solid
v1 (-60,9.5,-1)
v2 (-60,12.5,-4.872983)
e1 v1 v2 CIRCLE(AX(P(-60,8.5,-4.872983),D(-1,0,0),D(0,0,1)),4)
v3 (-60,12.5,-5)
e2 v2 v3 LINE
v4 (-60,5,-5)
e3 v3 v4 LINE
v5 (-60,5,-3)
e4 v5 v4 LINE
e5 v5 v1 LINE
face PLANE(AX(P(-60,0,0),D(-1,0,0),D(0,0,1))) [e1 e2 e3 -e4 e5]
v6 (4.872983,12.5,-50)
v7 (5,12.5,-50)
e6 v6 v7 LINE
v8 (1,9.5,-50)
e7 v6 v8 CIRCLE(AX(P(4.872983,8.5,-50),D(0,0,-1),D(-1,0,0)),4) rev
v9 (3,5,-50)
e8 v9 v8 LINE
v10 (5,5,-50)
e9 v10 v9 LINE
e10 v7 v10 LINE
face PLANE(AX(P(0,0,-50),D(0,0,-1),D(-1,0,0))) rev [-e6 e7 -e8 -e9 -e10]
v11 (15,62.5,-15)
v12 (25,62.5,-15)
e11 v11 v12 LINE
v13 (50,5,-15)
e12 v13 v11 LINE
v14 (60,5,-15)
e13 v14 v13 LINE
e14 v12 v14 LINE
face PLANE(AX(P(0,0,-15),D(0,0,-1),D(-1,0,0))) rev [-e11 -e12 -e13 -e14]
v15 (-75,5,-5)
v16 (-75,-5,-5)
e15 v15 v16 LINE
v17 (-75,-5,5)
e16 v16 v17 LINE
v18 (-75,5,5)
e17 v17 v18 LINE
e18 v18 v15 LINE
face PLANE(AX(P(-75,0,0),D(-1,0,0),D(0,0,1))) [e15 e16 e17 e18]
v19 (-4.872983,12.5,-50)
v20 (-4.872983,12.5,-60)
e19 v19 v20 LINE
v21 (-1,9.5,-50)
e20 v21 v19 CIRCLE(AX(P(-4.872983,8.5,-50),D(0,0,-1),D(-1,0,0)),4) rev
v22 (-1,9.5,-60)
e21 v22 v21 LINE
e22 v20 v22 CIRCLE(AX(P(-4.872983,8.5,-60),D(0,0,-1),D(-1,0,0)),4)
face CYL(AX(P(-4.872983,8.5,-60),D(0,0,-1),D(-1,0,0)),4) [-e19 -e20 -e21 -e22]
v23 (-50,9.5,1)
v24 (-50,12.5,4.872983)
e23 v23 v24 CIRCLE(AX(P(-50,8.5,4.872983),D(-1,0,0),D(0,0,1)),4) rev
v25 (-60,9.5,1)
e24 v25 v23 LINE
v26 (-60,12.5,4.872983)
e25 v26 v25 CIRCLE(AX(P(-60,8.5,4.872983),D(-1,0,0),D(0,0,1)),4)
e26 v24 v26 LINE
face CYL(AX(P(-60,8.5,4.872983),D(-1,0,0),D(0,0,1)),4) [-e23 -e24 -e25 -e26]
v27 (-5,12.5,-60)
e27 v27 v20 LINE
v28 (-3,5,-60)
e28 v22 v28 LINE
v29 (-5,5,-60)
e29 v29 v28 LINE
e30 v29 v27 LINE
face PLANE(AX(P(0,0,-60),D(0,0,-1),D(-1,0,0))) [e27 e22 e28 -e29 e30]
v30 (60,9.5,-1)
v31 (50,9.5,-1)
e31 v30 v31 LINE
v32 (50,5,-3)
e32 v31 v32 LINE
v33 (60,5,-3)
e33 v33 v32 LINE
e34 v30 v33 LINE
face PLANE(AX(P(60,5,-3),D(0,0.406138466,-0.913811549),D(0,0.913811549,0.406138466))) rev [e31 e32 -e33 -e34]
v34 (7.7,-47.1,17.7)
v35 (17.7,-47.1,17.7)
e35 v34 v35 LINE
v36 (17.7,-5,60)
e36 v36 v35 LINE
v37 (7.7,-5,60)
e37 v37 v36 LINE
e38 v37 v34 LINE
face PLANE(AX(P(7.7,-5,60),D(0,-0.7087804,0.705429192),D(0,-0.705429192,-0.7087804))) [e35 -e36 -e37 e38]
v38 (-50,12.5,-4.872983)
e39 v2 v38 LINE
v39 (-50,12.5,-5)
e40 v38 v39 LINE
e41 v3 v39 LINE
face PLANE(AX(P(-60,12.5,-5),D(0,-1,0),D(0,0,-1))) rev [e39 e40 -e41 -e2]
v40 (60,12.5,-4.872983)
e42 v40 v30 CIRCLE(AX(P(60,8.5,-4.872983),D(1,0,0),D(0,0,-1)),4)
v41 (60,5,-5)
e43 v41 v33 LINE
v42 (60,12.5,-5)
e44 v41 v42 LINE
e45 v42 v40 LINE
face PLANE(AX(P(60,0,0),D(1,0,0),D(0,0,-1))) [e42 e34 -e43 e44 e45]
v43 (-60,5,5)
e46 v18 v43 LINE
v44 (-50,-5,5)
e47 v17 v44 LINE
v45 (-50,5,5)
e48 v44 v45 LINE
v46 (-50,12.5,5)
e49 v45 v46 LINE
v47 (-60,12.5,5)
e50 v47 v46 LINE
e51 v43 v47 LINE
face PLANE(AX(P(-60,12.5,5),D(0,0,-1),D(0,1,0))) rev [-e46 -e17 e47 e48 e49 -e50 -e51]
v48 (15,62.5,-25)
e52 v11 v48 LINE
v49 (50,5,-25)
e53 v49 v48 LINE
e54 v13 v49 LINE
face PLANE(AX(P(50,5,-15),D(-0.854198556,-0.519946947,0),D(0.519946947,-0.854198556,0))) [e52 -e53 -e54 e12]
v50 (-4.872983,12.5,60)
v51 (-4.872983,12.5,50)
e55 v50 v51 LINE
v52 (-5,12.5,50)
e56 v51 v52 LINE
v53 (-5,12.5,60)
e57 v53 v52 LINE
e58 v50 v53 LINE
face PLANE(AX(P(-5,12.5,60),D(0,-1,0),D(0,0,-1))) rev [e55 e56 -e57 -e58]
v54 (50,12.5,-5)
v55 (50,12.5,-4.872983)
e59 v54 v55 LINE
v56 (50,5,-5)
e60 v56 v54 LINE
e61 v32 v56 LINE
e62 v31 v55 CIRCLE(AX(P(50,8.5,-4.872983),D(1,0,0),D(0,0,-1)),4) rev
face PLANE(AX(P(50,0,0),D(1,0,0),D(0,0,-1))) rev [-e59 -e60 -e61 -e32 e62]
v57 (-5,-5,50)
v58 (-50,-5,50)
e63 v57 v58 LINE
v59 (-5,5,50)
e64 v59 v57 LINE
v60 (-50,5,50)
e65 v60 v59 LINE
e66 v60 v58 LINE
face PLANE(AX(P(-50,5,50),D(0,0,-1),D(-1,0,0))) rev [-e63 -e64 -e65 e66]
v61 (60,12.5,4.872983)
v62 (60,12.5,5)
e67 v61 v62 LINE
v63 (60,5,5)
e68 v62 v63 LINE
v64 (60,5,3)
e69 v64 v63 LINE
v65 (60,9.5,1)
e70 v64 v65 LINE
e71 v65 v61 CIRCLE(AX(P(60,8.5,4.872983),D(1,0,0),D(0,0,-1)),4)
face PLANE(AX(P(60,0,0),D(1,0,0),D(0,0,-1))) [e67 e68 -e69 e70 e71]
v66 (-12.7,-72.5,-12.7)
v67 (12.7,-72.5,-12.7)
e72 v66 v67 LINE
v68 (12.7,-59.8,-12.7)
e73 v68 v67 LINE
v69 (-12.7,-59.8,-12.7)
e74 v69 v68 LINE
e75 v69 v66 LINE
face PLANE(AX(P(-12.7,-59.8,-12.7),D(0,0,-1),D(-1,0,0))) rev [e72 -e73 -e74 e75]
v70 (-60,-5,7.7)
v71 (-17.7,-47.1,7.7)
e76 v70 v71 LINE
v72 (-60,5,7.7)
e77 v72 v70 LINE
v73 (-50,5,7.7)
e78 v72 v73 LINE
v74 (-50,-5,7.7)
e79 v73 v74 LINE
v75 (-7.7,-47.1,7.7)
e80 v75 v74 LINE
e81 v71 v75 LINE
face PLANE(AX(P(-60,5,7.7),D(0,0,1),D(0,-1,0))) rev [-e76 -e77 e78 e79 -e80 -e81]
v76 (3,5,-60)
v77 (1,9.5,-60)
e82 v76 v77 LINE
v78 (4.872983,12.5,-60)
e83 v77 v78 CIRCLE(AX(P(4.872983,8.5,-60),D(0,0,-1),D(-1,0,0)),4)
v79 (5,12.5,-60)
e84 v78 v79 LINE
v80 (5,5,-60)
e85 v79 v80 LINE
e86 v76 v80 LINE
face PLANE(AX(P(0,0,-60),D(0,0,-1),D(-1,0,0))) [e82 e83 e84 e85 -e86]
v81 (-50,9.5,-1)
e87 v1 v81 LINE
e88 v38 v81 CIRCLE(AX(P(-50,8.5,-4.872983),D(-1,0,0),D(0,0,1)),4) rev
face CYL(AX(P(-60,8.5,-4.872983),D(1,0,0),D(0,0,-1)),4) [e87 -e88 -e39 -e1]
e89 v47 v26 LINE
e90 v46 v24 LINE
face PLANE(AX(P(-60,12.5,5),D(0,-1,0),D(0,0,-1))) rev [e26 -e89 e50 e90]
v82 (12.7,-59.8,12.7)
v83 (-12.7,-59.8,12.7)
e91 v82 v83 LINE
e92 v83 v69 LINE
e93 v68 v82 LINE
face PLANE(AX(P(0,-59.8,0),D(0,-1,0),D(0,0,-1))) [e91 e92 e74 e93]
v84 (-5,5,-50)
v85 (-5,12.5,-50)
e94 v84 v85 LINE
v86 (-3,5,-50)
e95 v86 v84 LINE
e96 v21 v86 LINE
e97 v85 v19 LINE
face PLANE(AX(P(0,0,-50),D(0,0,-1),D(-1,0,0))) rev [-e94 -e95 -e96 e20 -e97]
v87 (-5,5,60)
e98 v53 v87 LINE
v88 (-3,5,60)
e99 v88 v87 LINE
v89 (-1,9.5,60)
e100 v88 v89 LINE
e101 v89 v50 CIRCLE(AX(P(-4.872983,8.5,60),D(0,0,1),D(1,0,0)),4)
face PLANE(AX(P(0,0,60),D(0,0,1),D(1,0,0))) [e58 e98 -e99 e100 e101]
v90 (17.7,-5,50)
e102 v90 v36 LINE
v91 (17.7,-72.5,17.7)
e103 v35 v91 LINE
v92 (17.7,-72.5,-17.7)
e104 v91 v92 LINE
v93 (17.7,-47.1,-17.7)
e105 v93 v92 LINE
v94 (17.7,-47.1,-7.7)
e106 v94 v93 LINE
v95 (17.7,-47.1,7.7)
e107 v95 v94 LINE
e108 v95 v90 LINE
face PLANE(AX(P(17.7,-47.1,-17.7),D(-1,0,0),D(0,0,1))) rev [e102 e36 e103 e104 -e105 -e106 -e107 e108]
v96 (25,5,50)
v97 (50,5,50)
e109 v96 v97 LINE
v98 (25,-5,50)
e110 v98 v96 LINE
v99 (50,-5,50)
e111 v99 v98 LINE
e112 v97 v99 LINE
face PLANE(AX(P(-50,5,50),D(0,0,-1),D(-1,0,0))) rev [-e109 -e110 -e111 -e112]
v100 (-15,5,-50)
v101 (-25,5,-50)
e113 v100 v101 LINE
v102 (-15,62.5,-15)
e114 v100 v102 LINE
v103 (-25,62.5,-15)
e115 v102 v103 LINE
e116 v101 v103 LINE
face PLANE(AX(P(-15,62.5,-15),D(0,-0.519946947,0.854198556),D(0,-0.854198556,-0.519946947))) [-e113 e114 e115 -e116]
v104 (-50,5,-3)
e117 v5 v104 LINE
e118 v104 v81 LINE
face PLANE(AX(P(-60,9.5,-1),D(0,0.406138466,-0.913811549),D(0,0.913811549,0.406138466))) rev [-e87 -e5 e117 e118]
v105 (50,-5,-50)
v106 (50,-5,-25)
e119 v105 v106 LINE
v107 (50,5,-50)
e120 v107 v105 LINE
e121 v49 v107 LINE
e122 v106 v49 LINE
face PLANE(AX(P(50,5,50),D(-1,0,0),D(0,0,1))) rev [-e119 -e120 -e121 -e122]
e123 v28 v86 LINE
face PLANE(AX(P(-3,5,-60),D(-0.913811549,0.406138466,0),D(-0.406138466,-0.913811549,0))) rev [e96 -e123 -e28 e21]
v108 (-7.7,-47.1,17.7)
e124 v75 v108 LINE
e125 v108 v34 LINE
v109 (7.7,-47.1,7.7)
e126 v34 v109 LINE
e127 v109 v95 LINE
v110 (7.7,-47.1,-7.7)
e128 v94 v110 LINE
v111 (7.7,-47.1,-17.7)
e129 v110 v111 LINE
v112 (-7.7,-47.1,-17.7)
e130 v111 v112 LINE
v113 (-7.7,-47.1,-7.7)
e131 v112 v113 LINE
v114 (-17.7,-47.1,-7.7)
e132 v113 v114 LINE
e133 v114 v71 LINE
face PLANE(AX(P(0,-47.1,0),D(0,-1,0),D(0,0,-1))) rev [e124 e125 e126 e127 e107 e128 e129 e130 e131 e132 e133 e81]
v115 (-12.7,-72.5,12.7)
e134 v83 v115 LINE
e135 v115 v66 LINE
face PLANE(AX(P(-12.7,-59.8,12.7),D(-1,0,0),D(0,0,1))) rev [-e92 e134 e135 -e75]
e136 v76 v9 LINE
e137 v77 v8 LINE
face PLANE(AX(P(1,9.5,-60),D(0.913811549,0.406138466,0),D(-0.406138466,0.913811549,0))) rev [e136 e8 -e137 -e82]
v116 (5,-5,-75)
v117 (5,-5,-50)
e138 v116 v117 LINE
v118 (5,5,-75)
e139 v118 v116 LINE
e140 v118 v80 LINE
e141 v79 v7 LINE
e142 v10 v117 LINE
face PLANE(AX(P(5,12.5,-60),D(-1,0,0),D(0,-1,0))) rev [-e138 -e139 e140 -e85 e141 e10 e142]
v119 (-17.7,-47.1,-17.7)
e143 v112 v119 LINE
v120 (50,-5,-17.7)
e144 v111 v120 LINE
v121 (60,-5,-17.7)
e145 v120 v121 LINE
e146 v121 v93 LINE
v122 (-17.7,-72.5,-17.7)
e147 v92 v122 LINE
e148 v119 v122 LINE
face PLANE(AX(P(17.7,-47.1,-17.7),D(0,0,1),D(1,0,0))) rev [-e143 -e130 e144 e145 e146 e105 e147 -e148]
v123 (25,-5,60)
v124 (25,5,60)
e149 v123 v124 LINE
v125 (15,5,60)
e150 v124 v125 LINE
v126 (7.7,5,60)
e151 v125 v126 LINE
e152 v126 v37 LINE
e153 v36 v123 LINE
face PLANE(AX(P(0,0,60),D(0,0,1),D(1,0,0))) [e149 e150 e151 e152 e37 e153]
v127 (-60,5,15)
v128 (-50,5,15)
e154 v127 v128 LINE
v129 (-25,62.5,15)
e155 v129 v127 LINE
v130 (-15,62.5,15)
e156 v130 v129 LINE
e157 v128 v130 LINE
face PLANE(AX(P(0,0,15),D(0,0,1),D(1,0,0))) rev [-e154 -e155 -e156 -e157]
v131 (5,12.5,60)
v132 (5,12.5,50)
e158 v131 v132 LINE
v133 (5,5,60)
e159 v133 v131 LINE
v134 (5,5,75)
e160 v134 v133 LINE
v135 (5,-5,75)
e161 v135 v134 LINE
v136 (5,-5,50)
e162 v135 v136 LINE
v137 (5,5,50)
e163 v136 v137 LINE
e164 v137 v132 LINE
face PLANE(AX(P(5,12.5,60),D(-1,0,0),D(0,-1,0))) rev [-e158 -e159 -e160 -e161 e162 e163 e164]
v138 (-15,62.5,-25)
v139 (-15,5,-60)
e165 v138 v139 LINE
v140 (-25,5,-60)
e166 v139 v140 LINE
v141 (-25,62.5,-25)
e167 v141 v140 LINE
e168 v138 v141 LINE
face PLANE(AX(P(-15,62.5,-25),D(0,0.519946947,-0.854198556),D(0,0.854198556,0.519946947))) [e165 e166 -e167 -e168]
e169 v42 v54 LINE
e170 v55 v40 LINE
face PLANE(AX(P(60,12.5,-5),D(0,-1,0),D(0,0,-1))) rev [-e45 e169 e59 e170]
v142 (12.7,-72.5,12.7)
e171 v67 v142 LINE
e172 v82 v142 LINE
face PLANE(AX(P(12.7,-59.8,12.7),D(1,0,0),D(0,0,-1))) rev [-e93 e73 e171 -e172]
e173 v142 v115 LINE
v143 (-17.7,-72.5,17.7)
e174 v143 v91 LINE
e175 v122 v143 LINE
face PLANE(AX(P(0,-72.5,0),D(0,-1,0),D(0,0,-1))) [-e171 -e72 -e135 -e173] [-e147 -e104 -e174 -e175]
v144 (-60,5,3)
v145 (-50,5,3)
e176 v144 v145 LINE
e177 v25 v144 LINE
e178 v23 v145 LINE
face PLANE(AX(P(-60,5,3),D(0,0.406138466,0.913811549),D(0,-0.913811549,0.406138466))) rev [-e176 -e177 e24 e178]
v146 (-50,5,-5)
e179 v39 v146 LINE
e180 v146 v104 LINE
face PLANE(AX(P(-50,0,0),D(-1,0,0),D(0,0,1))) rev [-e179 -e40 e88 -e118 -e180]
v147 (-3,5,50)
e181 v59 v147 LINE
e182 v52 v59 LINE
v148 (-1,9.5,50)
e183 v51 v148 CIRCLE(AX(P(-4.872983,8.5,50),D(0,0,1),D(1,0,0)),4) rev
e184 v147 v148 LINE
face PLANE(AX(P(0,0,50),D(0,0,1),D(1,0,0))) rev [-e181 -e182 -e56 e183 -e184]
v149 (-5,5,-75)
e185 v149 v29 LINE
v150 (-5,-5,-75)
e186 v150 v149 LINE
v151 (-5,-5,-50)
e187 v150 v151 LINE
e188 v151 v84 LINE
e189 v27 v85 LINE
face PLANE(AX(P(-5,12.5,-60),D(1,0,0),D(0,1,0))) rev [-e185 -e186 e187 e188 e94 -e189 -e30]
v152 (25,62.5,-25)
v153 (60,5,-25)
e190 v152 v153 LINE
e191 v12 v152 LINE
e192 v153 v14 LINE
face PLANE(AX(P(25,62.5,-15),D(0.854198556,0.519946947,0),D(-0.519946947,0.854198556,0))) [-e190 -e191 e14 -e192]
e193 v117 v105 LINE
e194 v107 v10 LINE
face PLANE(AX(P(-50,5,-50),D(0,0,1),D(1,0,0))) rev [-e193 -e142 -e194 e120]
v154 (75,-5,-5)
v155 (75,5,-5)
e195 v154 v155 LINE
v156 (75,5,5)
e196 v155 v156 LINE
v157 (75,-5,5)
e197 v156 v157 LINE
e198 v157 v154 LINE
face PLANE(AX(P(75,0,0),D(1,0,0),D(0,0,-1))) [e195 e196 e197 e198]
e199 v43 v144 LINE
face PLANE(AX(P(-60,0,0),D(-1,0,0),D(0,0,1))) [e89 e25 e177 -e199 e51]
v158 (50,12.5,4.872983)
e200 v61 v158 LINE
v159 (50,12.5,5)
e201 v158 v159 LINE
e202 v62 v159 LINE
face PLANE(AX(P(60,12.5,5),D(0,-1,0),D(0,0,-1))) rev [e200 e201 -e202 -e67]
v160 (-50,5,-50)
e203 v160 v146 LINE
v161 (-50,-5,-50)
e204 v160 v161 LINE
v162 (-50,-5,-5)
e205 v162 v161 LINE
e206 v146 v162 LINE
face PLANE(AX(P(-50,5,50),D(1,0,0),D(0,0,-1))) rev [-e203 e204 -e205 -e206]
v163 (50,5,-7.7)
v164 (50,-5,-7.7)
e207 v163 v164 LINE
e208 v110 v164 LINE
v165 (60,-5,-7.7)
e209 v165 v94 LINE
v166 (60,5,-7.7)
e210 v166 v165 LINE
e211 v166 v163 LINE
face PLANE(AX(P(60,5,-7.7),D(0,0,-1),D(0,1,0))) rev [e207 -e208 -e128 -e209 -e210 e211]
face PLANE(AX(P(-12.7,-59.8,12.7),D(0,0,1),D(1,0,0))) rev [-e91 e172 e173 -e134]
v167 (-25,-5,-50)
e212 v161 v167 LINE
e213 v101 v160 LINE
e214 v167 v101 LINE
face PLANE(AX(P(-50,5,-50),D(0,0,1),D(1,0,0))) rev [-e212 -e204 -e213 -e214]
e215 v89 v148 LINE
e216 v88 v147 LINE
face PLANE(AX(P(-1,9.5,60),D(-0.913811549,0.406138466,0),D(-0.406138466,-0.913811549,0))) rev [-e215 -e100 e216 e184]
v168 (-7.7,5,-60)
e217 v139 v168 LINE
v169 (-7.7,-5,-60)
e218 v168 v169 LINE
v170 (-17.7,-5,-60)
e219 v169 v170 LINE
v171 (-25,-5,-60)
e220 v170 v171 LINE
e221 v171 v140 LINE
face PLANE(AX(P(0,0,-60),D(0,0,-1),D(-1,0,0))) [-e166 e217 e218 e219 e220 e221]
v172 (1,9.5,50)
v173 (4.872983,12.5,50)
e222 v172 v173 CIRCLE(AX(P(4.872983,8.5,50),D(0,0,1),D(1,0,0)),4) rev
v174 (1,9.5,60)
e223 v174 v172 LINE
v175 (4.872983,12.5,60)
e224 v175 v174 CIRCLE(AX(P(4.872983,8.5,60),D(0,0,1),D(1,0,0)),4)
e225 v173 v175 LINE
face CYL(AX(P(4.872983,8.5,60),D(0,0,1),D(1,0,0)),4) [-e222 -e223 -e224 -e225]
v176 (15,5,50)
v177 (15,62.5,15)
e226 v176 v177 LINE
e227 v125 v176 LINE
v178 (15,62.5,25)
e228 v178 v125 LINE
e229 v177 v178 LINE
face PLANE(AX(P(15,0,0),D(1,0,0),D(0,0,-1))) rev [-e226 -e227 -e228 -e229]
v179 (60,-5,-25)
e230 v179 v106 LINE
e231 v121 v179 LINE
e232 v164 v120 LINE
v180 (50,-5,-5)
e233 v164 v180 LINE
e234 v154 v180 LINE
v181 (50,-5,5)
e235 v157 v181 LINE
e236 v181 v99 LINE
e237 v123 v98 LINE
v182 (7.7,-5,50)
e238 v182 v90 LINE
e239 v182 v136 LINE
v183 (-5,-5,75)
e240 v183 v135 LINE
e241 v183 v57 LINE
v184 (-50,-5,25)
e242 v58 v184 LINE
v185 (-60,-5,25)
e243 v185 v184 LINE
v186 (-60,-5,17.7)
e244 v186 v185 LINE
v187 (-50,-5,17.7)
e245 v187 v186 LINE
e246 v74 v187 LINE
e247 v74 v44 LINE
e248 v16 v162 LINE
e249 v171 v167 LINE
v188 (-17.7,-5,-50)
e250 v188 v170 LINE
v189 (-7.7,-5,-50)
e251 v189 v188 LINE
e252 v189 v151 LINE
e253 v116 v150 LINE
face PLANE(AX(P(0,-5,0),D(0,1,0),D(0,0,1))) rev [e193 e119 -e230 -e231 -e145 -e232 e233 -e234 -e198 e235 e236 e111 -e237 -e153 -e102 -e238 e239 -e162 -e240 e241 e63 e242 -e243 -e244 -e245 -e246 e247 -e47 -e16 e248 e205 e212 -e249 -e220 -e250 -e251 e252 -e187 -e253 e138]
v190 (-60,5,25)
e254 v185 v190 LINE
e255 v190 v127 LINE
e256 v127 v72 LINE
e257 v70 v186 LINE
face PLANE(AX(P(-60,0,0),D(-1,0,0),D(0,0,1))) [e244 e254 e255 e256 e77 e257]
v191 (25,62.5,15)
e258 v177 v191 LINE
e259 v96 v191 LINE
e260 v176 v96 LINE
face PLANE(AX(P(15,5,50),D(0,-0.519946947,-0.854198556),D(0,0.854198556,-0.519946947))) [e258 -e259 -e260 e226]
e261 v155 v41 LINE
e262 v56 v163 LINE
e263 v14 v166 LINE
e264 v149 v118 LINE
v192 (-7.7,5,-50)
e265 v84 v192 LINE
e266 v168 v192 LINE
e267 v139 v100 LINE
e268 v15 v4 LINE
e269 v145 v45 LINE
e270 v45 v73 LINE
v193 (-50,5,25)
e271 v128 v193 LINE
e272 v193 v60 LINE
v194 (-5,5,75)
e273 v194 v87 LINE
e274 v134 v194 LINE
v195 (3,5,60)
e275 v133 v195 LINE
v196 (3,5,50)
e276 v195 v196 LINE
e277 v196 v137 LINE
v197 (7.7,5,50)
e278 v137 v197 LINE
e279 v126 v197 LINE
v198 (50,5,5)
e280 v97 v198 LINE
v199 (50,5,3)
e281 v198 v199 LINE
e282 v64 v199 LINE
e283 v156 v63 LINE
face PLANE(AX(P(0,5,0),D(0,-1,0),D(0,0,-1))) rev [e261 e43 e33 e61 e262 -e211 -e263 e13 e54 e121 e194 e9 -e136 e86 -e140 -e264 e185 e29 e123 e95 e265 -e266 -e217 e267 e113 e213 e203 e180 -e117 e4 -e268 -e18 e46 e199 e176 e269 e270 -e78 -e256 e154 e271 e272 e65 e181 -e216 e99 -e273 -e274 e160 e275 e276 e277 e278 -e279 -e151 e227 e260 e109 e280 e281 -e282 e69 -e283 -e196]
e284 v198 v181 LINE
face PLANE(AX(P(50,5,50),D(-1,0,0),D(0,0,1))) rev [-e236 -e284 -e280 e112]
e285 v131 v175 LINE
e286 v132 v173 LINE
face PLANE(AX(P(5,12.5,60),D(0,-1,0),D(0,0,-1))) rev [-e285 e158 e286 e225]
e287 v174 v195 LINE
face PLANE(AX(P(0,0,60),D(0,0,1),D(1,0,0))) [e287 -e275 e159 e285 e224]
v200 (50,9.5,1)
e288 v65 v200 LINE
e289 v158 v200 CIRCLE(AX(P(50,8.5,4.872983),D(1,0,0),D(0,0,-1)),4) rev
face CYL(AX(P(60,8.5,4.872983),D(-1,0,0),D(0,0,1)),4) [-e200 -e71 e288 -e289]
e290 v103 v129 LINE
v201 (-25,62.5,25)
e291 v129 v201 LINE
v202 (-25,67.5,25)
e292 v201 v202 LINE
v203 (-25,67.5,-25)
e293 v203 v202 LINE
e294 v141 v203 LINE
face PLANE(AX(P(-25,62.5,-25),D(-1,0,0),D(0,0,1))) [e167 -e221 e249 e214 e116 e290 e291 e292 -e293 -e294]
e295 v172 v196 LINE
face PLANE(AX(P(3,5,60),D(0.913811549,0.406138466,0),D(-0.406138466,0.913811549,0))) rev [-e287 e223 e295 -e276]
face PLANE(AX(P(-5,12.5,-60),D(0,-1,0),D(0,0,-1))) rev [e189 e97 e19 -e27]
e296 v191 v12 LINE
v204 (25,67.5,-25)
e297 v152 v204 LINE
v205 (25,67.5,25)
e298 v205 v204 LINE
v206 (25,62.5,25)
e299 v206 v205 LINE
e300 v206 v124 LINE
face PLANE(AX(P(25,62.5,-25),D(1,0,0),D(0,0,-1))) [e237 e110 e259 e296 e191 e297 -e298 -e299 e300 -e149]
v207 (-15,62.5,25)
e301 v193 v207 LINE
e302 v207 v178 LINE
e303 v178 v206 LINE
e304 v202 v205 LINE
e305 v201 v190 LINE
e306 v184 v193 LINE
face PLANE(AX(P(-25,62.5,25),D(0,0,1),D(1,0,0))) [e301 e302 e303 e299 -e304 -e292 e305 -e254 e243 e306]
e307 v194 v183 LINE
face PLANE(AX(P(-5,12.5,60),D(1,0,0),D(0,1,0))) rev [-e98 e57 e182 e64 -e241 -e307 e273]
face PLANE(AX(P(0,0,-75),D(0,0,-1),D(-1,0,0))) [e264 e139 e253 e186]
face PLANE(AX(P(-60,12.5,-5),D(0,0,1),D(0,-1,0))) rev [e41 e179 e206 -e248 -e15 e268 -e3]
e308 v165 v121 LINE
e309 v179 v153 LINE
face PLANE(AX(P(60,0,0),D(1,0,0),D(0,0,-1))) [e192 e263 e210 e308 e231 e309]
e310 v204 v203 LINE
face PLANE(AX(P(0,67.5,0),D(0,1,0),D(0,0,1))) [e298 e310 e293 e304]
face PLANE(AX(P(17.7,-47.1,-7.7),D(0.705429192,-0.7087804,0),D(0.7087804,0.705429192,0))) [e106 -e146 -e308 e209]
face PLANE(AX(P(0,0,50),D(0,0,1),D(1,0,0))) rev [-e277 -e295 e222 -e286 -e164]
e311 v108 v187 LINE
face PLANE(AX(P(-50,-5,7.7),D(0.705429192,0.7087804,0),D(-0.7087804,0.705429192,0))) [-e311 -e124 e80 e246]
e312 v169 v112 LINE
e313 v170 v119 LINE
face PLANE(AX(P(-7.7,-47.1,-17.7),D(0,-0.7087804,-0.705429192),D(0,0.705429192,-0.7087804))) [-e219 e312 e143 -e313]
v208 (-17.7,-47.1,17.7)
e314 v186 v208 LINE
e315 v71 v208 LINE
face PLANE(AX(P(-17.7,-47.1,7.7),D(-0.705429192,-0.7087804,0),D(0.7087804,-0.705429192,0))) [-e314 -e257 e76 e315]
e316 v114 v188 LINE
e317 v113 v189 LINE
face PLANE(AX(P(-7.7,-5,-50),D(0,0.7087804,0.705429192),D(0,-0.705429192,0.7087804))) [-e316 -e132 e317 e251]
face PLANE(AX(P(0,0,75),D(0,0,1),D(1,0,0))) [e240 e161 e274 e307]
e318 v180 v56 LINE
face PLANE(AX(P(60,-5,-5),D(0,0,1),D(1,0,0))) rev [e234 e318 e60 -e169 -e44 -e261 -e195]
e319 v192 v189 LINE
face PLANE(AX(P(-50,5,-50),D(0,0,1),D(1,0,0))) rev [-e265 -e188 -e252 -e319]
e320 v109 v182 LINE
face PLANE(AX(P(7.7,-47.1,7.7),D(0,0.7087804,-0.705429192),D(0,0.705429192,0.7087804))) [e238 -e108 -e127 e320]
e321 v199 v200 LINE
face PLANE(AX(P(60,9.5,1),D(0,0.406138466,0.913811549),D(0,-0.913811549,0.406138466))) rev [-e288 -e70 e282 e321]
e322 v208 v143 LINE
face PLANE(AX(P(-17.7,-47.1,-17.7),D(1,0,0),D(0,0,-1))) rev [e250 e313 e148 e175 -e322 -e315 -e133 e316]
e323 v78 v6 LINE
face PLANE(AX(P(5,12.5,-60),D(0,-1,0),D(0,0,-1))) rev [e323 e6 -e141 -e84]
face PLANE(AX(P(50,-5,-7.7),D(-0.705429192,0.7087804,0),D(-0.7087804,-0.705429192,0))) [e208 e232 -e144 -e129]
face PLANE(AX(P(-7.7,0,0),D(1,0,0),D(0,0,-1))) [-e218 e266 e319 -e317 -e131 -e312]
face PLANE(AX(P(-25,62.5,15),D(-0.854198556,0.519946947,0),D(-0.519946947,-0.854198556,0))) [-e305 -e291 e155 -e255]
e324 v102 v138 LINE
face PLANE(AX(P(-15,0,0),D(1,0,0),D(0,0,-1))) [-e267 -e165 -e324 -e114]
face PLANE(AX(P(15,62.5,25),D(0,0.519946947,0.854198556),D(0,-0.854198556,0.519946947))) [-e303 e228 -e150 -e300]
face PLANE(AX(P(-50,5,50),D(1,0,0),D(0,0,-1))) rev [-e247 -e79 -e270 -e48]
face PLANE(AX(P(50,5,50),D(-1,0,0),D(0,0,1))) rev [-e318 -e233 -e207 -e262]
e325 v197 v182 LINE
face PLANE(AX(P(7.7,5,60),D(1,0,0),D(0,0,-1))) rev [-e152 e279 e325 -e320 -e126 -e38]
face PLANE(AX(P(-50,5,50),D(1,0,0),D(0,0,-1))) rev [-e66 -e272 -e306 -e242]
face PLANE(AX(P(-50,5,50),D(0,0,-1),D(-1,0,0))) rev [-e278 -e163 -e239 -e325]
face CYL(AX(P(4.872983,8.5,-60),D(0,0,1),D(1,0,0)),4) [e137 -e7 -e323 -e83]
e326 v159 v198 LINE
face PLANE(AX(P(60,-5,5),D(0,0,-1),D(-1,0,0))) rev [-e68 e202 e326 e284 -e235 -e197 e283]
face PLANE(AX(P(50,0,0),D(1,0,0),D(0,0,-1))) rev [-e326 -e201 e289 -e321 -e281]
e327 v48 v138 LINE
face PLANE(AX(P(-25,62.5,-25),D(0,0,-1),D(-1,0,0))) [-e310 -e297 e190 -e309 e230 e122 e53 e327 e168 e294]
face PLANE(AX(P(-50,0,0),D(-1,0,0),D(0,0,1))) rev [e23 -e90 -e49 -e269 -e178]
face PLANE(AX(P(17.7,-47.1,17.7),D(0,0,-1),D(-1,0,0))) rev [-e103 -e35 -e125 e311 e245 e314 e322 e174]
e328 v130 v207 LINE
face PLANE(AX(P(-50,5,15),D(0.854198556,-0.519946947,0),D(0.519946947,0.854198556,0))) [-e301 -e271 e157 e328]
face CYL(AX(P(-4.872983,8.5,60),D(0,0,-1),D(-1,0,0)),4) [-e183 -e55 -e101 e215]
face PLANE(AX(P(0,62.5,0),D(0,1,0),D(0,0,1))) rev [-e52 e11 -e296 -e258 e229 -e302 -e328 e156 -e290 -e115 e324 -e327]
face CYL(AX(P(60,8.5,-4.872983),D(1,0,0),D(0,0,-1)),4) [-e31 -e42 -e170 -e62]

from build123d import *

# Parameters (mm, degrees)
SKETCH2_W            = 100
SKETCH2_H            = 100
BOSS_EXTRUDE1_DEPTH  = 5
SKETCH3_W            = 100
SKETCH3_H            = 100
BOSS_EXTRUDE2_DEPTH  = 5
SKETCH8_R            = 5
BOSS_EXTRUDE7_DEPTH  = 30
BOSS_EXTRUDE21_DEPTH = 10
FILLET14_R           = 4
FILLET13_R           = 4
SKETCH24_W           = 10
SKETCH24_H           = 10
BOSS_EXTRUDE22_DEPTH = 15
BOSS_EXTRUDE25_DEPTH = 10
SKETCH26_W           = 10
SKETCH26_H           = 10
BOSS_EXTRUDE26_DEPTH = 15
FILLET18_R           = 4
FILLET17_R           = 4
BOSS_EXTRUDE23_DEPTH = 10
SKETCH25_W           = 10
SKETCH25_H           = 10
BOSS_EXTRUDE24_DEPTH = 15
FILLET15_R           = 4
FILLET16_R           = 4
BOSS_EXTRUDE10_DEPTH = 10
FILLET19_R           = 4
SKETCH27_W           = 10
SKETCH27_H           = 10
BOSS_EXTRUDE27_DEPTH = 15
FILLET20_R           = 4
SKETCH62_R           = 11.223510807
CUT_EXTRUDE3_DEPTH   = 30
SKETCH64_W           = 35.4
SKETCH64_H           = 35.4
BOSS_EXTRUDE53_DEPTH = 25.4
SKETCH66_W           = 25.4
SKETCH66_H           = 25.4
CUT_EXTRUDE4_DEPTH   = 12.7
SKETCH67_W           = 50
SKETCH67_H           = 50
BOSS_EXTRUDE54_DEPTH = 5
SKETCH68_W           = 17.3
SKETCH68_H           = 10
BOSS_EXTRUDE55_DEPTH = 10
SKETCH70_W           = 17.3
SKETCH70_H           = 10
BOSS_EXTRUDE57_DEPTH = 10
SKETCH74_W           = 17.3
SKETCH74_H           = 10
BOSS_EXTRUDE58_DEPTH = 10
BOSS_EXTRUDE59_DEPTH = 10
BOSS_EXTRUDE60_DEPTH = 10
BOSS_EXTRUDE61_DEPTH = 10
BOSS_EXTRUDE62_DEPTH = 10
BOSS_EXTRUDE63_DEPTH = 10
BOSS_EXTRUDE64_DEPTH = 10
SKETCH85_W           = 17.3
SKETCH85_H           = 10
BOSS_EXTRUDE65_DEPTH = 10
BOSS_EXTRUDE66_DEPTH = 10
BOSS_EXTRUDE67_DEPTH = 10


with BuildPart() as part:
    # Sketch2 → Boss-Extrude1 (new body)
    with BuildSketch(Plane(origin=(0, 0, 0), x_dir=(1, 0, 0), z_dir=(0, 1, 0))):
        Rectangle(SKETCH2_W, SKETCH2_H)
    extrude(amount=BOSS_EXTRUDE1_DEPTH)

    # Sketch3 → Boss-Extrude2 (add)
    with BuildSketch(Plane.XZ):
        Rectangle(SKETCH3_W, SKETCH3_H)
    extrude(amount=BOSS_EXTRUDE2_DEPTH)

    # Sketch8 → Boss-Extrude7 (add)
    with BuildSketch(Plane.XZ.offset(5)):
        with Locations(Location((0, 0, 0), (0, 0, 90))):
            Circle(SKETCH8_R)
    extrude(amount=BOSS_EXTRUDE7_DEPTH)

    # Sketch11 → Boss-Extrude21 (add)
    with BuildSketch(Plane(origin=(50, 0, 0), x_dir=(0, 0, -1), z_dir=(1, 0, 0))):
        Polygon((5, -5), (5, 12.5), (1, 12.5), (1, 9.5), (3, 5), (-3, 5), (-1, 9.5), (-1, 12.5), (-5, 12.5), (-5, -5), align=None)
    extrude(amount=BOSS_EXTRUDE21_DEPTH)

    # Fillet14
    # the kernel refuses this fillet: 4 mm, written as the material it takes off along each edge
    with BuildSketch(Plane(origin=(40.317541634, 12.5, -1), x_dir=(0, -1, 0), z_dir=(1, 0, 0))) as fillet14_piece_1:
        with BuildLine():
            CenterArc((4, 3.872983346), FILLET14_R, 180, 75.522487814)
            Line((0, 3.872983346), (-0.08, 3.872983346))
            Line((-0.08, 3.872983346), (-0.08, 0))
            Line((-0.08, 0), (0, -0.08))
            ThreePointArc((0, -0.08), (1.5, -0.08), (2.98, -0.077459667))
            Line((2.98, -0.077459667), (3, 0))
        make_face()
    extrude(amount=29.364916731, mode=Mode.SUBTRACT)

    # Fillet13
    # the kernel refuses this fillet: 4 mm, written as the material it takes off along each edge
    with BuildSketch(Plane(origin=(40.317541634, 12.5, 1), x_dir=(0, 0, 1), z_dir=(1, 0, 0))) as fillet13_piece_1:
        with BuildLine():
            CenterArc((3.872983346, 4), FILLET13_R, 194.477512186, 75.522487814)
            Line((0, 3), (-0.077459667, 2.98))
            ThreePointArc((-0.077459667, 2.98), (-0.08, 1.5), (-0.08, 0))
            Line((-0.08, 0), (0, -0.08))
            Line((0, -0.08), (3.872983346, -0.08))
            Line((3.872983346, -0.08), (3.872983346, 0))
        make_face()
    extrude(amount=29.364916731, mode=Mode.SUBTRACT)

    # Sketch24 → Boss-Extrude22 (add)
    with BuildSketch(Plane(origin=(60, 0, 0), x_dir=(0, 0, -1), z_dir=(1, 0, 0))):
        Rectangle(SKETCH24_W, SKETCH24_H)
    extrude(amount=BOSS_EXTRUDE22_DEPTH)

    # Sketch13 → Boss-Extrude25 (add)
    with BuildSketch(Plane.ZY.offset(50)):
        Polygon((-5, 12.5), (-5, -5), (5, -5), (5, 12.5), (1, 12.5), (1, 9.5), (3, 5), (-3, 5), (-1, 9.5), (-1, 12.5), align=None)
    extrude(amount=BOSS_EXTRUDE25_DEPTH)

    # Sketch26 → Boss-Extrude26 (add)
    with BuildSketch(Plane.ZY.offset(60)):
        Rectangle(SKETCH26_W, SKETCH26_H)
    extrude(amount=BOSS_EXTRUDE26_DEPTH)

    # Fillet18
    # the kernel refuses this fillet: 4 mm, written as the material it takes off along each edge
    with BuildSketch(Plane(origin=(-40.317541634, 12.5, 1), x_dir=(0, -1, 0), z_dir=(-1, 0, 0))) as fillet18_piece_1:
        with BuildLine():
            CenterArc((4, 3.872983346), FILLET18_R, 180, 75.522487814)
            Line((0, 3.872983346), (-0.08, 3.872983346))
            Line((-0.08, 3.872983346), (-0.08, 0))
            Line((-0.08, 0), (0, -0.08))
            ThreePointArc((0, -0.08), (1.5, -0.08), (2.98, -0.077459667))
            Line((2.98, -0.077459667), (3, 0))
        make_face()
    extrude(amount=29.364916731, mode=Mode.SUBTRACT)

    # Fillet17
    # the kernel refuses this fillet: 4 mm, written as the material it takes off along each edge
    with BuildSketch(Plane(origin=(-40.317541634, 12.5, -1), x_dir=(0, 0, -1), z_dir=(-1, 0, 0))) as fillet17_piece_1:
        with BuildLine():
            CenterArc((3.872983346, 4), FILLET17_R, 194.477512186, 75.522487814)
            Line((0, 3), (-0.077459667, 2.98))
            ThreePointArc((-0.077459667, 2.98), (-0.08, 1.5), (-0.08, 0))
            Line((-0.08, 0), (0, -0.08))
            Line((0, -0.08), (3.872983346, -0.08))
            Line((3.872983346, -0.08), (3.872983346, 0))
        make_face()
    extrude(amount=29.364916731, mode=Mode.SUBTRACT)

    # Sketch14 → Boss-Extrude23 (add)
    with BuildSketch(Plane(origin=(0, 0, -50), x_dir=(-1, 0, 0), z_dir=(0, 0, -1))):
        Polygon((-5, 12.5), (-1, 12.5), (-1, 9.5), (-3, 5), (3, 5), (1, 9.5), (1, 12.5), (5, 12.5), (5, -5), (-5, -5), align=None)
    extrude(amount=BOSS_EXTRUDE23_DEPTH)

    # Sketch25 → Boss-Extrude24 (add)
    with BuildSketch(Plane(origin=(0, 0, -60), x_dir=(-1, 0, 0), z_dir=(0, 0, -1))):
        Rectangle(SKETCH25_W, SKETCH25_H)
    extrude(amount=BOSS_EXTRUDE24_DEPTH)

    # Fillet15
    # the kernel refuses this fillet: 4 mm, written as the material it takes off along each edge
    with BuildSketch(Plane(origin=(-1, 12.5, -40.317541634), x_dir=(0, -1, 0), z_dir=(0, 0, -1))) as fillet15_piece_1:
        with BuildLine():
            CenterArc((4, 3.872983346), FILLET15_R, 180, 75.522487814)
            Line((0, 3.872983346), (-0.08, 3.872983346))
            Line((-0.08, 3.872983346), (-0.08, 0))
            Line((-0.08, 0), (0, -0.08))
            ThreePointArc((0, -0.08), (1.5, -0.08), (2.98, -0.077459667))
            Line((2.98, -0.077459667), (3, 0))
        make_face()
    extrude(amount=29.364916731, mode=Mode.SUBTRACT)

    # Fillet16
    # the kernel refuses this fillet: 4 mm, written as the material it takes off along each edge
    with BuildSketch(Plane(origin=(1, 12.5, -40.317541634), x_dir=(0, -1, 0), z_dir=(0, 0, -1))) as fillet16_piece_1:
        with BuildLine():
            CenterArc((4, -3.872983346), FILLET16_R, 104.477512186, 75.522487814)
            Line((0, -3.872983346), (-0.08, -3.872983346))
            Line((-0.08, -3.872983346), (-0.08, 0))
            Line((-0.08, 0), (0, 0.08))
            ThreePointArc((0, 0.08), (1.5, 0.08), (2.98, 0.077459667))
            Line((2.98, 0.077459667), (3, 0))
        make_face()
    extrude(amount=29.364916731, mode=Mode.SUBTRACT)

    # Sketch12 → Boss-Extrude10 (add)
    with BuildSketch(Plane.XY.offset(50)):
        Polygon((-5, 12.5), (-5, -5), (5, -5), (5, 12.5), (1, 12.5), (1, 9.5), (3, 5), (-3, 5), (-1, 9.5), (-1, 12.5), align=None)
    extrude(amount=BOSS_EXTRUDE10_DEPTH)

    # Fillet19
    # the kernel refuses this fillet: 4 mm, written as the material it takes off along each edge
    with BuildSketch(Plane(origin=(-1, 12.5, 40.317541634), x_dir=(-1, 0, 0), z_dir=(0, 0, 1))) as fillet19_piece_1:
        with BuildLine():
            CenterArc((3.872983346, 4), FILLET19_R, 194.477512186, 75.522487814)
            Line((0, 3), (-0.077459667, 2.98))
            ThreePointArc((-0.077459667, 2.98), (-0.08, 1.5), (-0.08, 0))
            Line((-0.08, 0), (0, -0.08))
            Line((0, -0.08), (3.872983346, -0.08))
            Line((3.872983346, -0.08), (3.872983346, 0))
        make_face()
    extrude(amount=29.364916731, mode=Mode.SUBTRACT)

    # Sketch27 → Boss-Extrude27 (add)
    with BuildSketch(Plane.XY.offset(60)):
        Rectangle(SKETCH27_W, SKETCH27_H)
    extrude(amount=BOSS_EXTRUDE27_DEPTH)

    # Fillet20
    # the kernel refuses this fillet: 4 mm, written as the material it takes off along each edge
    with BuildSketch(Plane(origin=(1, 12.5, 40.317541634), x_dir=(1, 0, 0), z_dir=(0, 0, 1))) as fillet20_piece_1:
        with BuildLine():
            CenterArc((3.872983346, -4), FILLET20_R, 90, 75.522487814)
            Line((0, -3), (-0.077459667, -2.98))
            ThreePointArc((-0.077459667, -2.98), (-0.08, -1.5), (-0.08, 0))
            Line((-0.08, 0), (0, 0.08))
            Line((0, 0.08), (3.872983346, 0.08))
            Line((3.872983346, 0.08), (3.872983346, 0))
        make_face()
    extrude(amount=29.364916731, mode=Mode.SUBTRACT)

    # Sketch62 → Cut-Extrude3 (cut)
    with BuildSketch(Plane.XZ.offset(5)):
        Circle(SKETCH62_R)
    extrude(amount=CUT_EXTRUDE3_DEPTH, mode=Mode.SUBTRACT)

    # Sketch68 → Boss-Extrude55 (add)
    with BuildSketch(Plane.XY.offset(50)):
        with Locations((16.35, 0)):
            Rectangle(SKETCH68_W, SKETCH68_H)
    extrude(amount=BOSS_EXTRUDE55_DEPTH)

    # Sketch70 → Boss-Extrude57 (add)
    with BuildSketch(Plane(origin=(0, 0, -50), x_dir=(-1, 0, 0), z_dir=(0, 0, -1))):
        with Locations((16.35, 0)):
            Rectangle(SKETCH70_W, SKETCH70_H)
    extrude(amount=BOSS_EXTRUDE57_DEPTH)

    # Sketch74 → Boss-Extrude58 (add)
    with BuildSketch(Plane.ZY.offset(50)):
        with Locations((16.35, 0)):
            Rectangle(SKETCH74_W, SKETCH74_H)
    extrude(amount=BOSS_EXTRUDE58_DEPTH)



with BuildPart() as body_2:
    # Sketch64 → Boss-Extrude53 (new body)
    with BuildSketch(Plane(origin=(0, -72.5, 0), x_dir=(1, 0, 0), z_dir=(0, 1, 0))):
        Rectangle(SKETCH64_W, SKETCH64_H)
    extrude(amount=BOSS_EXTRUDE53_DEPTH)

    # Sketch66 → Cut-Extrude4 (cut)
    with BuildSketch(Plane(origin=(0, -72.5, 0), x_dir=(-1, 0, 0), z_dir=(0, -1, 0))):
        Rectangle(SKETCH66_W, SKETCH66_H)
    extrude(amount=-CUT_EXTRUDE4_DEPTH, mode=Mode.SUBTRACT)


with BuildPart() as body_3:
    # Sketch67 → Boss-Extrude54 (new body)
    with BuildSketch(Plane(origin=(0, 67.5, 0), x_dir=(1, 0, 0), z_dir=(0, 1, 0))):
        Rectangle(SKETCH67_W, SKETCH67_H)
    extrude(amount=-BOSS_EXTRUDE54_DEPTH)


with BuildPart() as part_1:
    add(part.part)

    add(body_2.part)  # Boss-Extrude59 merges body 2
    # Sketch76 → Boss-Extrude59 (add)
    with BuildSketch(Plane.ZY.offset(17.7)):
        Polygon((-17.7, -47.1), (-60, -5), (-50, -5), (-7.7, -47.1), align=None)
    extrude(amount=-BOSS_EXTRUDE59_DEPTH)


    add(body_3.part)  # Boss-Extrude60 merges body 3
    # Sketch77 → Boss-Extrude60 (add)
    with BuildSketch(Plane.ZY.offset(25)):
        Polygon((-25, 62.5), (-60, 5), (-50, 5), (-15, 62.5), align=None)
    extrude(amount=-BOSS_EXTRUDE60_DEPTH)

    # Sketch78 → Boss-Extrude61 (add)
    with BuildSketch(Plane.XY.offset(17.7)):
        Polygon((-17.7, -47.1), (-60, -5), (-50, -5), (-7.7, -47.1), align=None)
    extrude(amount=-BOSS_EXTRUDE61_DEPTH)

    # Sketch79 → Boss-Extrude62 (add)
    with BuildSketch(Plane.XY.offset(25)):
        Polygon((-25, 62.5), (-60, 5), (-50, 5), (-15, 62.5), align=None)
    extrude(amount=-BOSS_EXTRUDE62_DEPTH)

    # Sketch82 → Boss-Extrude63 (add)
    with BuildSketch(Plane(origin=(17.7, 0, 0), x_dir=(0, 0, -1), z_dir=(1, 0, 0))):
        Polygon((-60, -5), (-17.7, -47.1), (-7.7, -47.1), (-50, -5), align=None)
    extrude(amount=-BOSS_EXTRUDE63_DEPTH)

    # Sketch83 → Boss-Extrude64 (add)
    with BuildSketch(Plane(origin=(25, 0, 0), x_dir=(0, 0, -1), z_dir=(1, 0, 0))):
        Polygon((-25, 62.5), (-60, 5), (-50, 5), (-15, 62.5), align=None)
    extrude(amount=-BOSS_EXTRUDE64_DEPTH)

    # Sketch85 → Boss-Extrude65 (add)
    with BuildSketch(Plane(origin=(50, 0, 0), x_dir=(0, 0, -1), z_dir=(1, 0, 0))):
        with Locations((16.35, 0)):
            Rectangle(SKETCH85_W, SKETCH85_H)
    extrude(amount=BOSS_EXTRUDE65_DEPTH)

    # Sketch86 → Boss-Extrude66 (add)
    with BuildSketch(Plane(origin=(0, 0, -25), x_dir=(-1, 0, 0), z_dir=(0, 0, -1))):
        Polygon((-25, 62.5), (-60, 5), (-50, 5), (-15, 62.5), align=None)
    extrude(amount=-BOSS_EXTRUDE66_DEPTH)

    # Sketch89 → Boss-Extrude67 (add)
    with BuildSketch(Plane(origin=(0, 0, -17.7), x_dir=(-1, 0, 0), z_dir=(0, 0, -1))):
        Polygon((-60, -5), (-50, -5), (-7.7, -47.1), (-17.7, -47.1), align=None)
    extrude(amount=-BOSS_EXTRUDE67_DEPTH)


solid = part_1.part
